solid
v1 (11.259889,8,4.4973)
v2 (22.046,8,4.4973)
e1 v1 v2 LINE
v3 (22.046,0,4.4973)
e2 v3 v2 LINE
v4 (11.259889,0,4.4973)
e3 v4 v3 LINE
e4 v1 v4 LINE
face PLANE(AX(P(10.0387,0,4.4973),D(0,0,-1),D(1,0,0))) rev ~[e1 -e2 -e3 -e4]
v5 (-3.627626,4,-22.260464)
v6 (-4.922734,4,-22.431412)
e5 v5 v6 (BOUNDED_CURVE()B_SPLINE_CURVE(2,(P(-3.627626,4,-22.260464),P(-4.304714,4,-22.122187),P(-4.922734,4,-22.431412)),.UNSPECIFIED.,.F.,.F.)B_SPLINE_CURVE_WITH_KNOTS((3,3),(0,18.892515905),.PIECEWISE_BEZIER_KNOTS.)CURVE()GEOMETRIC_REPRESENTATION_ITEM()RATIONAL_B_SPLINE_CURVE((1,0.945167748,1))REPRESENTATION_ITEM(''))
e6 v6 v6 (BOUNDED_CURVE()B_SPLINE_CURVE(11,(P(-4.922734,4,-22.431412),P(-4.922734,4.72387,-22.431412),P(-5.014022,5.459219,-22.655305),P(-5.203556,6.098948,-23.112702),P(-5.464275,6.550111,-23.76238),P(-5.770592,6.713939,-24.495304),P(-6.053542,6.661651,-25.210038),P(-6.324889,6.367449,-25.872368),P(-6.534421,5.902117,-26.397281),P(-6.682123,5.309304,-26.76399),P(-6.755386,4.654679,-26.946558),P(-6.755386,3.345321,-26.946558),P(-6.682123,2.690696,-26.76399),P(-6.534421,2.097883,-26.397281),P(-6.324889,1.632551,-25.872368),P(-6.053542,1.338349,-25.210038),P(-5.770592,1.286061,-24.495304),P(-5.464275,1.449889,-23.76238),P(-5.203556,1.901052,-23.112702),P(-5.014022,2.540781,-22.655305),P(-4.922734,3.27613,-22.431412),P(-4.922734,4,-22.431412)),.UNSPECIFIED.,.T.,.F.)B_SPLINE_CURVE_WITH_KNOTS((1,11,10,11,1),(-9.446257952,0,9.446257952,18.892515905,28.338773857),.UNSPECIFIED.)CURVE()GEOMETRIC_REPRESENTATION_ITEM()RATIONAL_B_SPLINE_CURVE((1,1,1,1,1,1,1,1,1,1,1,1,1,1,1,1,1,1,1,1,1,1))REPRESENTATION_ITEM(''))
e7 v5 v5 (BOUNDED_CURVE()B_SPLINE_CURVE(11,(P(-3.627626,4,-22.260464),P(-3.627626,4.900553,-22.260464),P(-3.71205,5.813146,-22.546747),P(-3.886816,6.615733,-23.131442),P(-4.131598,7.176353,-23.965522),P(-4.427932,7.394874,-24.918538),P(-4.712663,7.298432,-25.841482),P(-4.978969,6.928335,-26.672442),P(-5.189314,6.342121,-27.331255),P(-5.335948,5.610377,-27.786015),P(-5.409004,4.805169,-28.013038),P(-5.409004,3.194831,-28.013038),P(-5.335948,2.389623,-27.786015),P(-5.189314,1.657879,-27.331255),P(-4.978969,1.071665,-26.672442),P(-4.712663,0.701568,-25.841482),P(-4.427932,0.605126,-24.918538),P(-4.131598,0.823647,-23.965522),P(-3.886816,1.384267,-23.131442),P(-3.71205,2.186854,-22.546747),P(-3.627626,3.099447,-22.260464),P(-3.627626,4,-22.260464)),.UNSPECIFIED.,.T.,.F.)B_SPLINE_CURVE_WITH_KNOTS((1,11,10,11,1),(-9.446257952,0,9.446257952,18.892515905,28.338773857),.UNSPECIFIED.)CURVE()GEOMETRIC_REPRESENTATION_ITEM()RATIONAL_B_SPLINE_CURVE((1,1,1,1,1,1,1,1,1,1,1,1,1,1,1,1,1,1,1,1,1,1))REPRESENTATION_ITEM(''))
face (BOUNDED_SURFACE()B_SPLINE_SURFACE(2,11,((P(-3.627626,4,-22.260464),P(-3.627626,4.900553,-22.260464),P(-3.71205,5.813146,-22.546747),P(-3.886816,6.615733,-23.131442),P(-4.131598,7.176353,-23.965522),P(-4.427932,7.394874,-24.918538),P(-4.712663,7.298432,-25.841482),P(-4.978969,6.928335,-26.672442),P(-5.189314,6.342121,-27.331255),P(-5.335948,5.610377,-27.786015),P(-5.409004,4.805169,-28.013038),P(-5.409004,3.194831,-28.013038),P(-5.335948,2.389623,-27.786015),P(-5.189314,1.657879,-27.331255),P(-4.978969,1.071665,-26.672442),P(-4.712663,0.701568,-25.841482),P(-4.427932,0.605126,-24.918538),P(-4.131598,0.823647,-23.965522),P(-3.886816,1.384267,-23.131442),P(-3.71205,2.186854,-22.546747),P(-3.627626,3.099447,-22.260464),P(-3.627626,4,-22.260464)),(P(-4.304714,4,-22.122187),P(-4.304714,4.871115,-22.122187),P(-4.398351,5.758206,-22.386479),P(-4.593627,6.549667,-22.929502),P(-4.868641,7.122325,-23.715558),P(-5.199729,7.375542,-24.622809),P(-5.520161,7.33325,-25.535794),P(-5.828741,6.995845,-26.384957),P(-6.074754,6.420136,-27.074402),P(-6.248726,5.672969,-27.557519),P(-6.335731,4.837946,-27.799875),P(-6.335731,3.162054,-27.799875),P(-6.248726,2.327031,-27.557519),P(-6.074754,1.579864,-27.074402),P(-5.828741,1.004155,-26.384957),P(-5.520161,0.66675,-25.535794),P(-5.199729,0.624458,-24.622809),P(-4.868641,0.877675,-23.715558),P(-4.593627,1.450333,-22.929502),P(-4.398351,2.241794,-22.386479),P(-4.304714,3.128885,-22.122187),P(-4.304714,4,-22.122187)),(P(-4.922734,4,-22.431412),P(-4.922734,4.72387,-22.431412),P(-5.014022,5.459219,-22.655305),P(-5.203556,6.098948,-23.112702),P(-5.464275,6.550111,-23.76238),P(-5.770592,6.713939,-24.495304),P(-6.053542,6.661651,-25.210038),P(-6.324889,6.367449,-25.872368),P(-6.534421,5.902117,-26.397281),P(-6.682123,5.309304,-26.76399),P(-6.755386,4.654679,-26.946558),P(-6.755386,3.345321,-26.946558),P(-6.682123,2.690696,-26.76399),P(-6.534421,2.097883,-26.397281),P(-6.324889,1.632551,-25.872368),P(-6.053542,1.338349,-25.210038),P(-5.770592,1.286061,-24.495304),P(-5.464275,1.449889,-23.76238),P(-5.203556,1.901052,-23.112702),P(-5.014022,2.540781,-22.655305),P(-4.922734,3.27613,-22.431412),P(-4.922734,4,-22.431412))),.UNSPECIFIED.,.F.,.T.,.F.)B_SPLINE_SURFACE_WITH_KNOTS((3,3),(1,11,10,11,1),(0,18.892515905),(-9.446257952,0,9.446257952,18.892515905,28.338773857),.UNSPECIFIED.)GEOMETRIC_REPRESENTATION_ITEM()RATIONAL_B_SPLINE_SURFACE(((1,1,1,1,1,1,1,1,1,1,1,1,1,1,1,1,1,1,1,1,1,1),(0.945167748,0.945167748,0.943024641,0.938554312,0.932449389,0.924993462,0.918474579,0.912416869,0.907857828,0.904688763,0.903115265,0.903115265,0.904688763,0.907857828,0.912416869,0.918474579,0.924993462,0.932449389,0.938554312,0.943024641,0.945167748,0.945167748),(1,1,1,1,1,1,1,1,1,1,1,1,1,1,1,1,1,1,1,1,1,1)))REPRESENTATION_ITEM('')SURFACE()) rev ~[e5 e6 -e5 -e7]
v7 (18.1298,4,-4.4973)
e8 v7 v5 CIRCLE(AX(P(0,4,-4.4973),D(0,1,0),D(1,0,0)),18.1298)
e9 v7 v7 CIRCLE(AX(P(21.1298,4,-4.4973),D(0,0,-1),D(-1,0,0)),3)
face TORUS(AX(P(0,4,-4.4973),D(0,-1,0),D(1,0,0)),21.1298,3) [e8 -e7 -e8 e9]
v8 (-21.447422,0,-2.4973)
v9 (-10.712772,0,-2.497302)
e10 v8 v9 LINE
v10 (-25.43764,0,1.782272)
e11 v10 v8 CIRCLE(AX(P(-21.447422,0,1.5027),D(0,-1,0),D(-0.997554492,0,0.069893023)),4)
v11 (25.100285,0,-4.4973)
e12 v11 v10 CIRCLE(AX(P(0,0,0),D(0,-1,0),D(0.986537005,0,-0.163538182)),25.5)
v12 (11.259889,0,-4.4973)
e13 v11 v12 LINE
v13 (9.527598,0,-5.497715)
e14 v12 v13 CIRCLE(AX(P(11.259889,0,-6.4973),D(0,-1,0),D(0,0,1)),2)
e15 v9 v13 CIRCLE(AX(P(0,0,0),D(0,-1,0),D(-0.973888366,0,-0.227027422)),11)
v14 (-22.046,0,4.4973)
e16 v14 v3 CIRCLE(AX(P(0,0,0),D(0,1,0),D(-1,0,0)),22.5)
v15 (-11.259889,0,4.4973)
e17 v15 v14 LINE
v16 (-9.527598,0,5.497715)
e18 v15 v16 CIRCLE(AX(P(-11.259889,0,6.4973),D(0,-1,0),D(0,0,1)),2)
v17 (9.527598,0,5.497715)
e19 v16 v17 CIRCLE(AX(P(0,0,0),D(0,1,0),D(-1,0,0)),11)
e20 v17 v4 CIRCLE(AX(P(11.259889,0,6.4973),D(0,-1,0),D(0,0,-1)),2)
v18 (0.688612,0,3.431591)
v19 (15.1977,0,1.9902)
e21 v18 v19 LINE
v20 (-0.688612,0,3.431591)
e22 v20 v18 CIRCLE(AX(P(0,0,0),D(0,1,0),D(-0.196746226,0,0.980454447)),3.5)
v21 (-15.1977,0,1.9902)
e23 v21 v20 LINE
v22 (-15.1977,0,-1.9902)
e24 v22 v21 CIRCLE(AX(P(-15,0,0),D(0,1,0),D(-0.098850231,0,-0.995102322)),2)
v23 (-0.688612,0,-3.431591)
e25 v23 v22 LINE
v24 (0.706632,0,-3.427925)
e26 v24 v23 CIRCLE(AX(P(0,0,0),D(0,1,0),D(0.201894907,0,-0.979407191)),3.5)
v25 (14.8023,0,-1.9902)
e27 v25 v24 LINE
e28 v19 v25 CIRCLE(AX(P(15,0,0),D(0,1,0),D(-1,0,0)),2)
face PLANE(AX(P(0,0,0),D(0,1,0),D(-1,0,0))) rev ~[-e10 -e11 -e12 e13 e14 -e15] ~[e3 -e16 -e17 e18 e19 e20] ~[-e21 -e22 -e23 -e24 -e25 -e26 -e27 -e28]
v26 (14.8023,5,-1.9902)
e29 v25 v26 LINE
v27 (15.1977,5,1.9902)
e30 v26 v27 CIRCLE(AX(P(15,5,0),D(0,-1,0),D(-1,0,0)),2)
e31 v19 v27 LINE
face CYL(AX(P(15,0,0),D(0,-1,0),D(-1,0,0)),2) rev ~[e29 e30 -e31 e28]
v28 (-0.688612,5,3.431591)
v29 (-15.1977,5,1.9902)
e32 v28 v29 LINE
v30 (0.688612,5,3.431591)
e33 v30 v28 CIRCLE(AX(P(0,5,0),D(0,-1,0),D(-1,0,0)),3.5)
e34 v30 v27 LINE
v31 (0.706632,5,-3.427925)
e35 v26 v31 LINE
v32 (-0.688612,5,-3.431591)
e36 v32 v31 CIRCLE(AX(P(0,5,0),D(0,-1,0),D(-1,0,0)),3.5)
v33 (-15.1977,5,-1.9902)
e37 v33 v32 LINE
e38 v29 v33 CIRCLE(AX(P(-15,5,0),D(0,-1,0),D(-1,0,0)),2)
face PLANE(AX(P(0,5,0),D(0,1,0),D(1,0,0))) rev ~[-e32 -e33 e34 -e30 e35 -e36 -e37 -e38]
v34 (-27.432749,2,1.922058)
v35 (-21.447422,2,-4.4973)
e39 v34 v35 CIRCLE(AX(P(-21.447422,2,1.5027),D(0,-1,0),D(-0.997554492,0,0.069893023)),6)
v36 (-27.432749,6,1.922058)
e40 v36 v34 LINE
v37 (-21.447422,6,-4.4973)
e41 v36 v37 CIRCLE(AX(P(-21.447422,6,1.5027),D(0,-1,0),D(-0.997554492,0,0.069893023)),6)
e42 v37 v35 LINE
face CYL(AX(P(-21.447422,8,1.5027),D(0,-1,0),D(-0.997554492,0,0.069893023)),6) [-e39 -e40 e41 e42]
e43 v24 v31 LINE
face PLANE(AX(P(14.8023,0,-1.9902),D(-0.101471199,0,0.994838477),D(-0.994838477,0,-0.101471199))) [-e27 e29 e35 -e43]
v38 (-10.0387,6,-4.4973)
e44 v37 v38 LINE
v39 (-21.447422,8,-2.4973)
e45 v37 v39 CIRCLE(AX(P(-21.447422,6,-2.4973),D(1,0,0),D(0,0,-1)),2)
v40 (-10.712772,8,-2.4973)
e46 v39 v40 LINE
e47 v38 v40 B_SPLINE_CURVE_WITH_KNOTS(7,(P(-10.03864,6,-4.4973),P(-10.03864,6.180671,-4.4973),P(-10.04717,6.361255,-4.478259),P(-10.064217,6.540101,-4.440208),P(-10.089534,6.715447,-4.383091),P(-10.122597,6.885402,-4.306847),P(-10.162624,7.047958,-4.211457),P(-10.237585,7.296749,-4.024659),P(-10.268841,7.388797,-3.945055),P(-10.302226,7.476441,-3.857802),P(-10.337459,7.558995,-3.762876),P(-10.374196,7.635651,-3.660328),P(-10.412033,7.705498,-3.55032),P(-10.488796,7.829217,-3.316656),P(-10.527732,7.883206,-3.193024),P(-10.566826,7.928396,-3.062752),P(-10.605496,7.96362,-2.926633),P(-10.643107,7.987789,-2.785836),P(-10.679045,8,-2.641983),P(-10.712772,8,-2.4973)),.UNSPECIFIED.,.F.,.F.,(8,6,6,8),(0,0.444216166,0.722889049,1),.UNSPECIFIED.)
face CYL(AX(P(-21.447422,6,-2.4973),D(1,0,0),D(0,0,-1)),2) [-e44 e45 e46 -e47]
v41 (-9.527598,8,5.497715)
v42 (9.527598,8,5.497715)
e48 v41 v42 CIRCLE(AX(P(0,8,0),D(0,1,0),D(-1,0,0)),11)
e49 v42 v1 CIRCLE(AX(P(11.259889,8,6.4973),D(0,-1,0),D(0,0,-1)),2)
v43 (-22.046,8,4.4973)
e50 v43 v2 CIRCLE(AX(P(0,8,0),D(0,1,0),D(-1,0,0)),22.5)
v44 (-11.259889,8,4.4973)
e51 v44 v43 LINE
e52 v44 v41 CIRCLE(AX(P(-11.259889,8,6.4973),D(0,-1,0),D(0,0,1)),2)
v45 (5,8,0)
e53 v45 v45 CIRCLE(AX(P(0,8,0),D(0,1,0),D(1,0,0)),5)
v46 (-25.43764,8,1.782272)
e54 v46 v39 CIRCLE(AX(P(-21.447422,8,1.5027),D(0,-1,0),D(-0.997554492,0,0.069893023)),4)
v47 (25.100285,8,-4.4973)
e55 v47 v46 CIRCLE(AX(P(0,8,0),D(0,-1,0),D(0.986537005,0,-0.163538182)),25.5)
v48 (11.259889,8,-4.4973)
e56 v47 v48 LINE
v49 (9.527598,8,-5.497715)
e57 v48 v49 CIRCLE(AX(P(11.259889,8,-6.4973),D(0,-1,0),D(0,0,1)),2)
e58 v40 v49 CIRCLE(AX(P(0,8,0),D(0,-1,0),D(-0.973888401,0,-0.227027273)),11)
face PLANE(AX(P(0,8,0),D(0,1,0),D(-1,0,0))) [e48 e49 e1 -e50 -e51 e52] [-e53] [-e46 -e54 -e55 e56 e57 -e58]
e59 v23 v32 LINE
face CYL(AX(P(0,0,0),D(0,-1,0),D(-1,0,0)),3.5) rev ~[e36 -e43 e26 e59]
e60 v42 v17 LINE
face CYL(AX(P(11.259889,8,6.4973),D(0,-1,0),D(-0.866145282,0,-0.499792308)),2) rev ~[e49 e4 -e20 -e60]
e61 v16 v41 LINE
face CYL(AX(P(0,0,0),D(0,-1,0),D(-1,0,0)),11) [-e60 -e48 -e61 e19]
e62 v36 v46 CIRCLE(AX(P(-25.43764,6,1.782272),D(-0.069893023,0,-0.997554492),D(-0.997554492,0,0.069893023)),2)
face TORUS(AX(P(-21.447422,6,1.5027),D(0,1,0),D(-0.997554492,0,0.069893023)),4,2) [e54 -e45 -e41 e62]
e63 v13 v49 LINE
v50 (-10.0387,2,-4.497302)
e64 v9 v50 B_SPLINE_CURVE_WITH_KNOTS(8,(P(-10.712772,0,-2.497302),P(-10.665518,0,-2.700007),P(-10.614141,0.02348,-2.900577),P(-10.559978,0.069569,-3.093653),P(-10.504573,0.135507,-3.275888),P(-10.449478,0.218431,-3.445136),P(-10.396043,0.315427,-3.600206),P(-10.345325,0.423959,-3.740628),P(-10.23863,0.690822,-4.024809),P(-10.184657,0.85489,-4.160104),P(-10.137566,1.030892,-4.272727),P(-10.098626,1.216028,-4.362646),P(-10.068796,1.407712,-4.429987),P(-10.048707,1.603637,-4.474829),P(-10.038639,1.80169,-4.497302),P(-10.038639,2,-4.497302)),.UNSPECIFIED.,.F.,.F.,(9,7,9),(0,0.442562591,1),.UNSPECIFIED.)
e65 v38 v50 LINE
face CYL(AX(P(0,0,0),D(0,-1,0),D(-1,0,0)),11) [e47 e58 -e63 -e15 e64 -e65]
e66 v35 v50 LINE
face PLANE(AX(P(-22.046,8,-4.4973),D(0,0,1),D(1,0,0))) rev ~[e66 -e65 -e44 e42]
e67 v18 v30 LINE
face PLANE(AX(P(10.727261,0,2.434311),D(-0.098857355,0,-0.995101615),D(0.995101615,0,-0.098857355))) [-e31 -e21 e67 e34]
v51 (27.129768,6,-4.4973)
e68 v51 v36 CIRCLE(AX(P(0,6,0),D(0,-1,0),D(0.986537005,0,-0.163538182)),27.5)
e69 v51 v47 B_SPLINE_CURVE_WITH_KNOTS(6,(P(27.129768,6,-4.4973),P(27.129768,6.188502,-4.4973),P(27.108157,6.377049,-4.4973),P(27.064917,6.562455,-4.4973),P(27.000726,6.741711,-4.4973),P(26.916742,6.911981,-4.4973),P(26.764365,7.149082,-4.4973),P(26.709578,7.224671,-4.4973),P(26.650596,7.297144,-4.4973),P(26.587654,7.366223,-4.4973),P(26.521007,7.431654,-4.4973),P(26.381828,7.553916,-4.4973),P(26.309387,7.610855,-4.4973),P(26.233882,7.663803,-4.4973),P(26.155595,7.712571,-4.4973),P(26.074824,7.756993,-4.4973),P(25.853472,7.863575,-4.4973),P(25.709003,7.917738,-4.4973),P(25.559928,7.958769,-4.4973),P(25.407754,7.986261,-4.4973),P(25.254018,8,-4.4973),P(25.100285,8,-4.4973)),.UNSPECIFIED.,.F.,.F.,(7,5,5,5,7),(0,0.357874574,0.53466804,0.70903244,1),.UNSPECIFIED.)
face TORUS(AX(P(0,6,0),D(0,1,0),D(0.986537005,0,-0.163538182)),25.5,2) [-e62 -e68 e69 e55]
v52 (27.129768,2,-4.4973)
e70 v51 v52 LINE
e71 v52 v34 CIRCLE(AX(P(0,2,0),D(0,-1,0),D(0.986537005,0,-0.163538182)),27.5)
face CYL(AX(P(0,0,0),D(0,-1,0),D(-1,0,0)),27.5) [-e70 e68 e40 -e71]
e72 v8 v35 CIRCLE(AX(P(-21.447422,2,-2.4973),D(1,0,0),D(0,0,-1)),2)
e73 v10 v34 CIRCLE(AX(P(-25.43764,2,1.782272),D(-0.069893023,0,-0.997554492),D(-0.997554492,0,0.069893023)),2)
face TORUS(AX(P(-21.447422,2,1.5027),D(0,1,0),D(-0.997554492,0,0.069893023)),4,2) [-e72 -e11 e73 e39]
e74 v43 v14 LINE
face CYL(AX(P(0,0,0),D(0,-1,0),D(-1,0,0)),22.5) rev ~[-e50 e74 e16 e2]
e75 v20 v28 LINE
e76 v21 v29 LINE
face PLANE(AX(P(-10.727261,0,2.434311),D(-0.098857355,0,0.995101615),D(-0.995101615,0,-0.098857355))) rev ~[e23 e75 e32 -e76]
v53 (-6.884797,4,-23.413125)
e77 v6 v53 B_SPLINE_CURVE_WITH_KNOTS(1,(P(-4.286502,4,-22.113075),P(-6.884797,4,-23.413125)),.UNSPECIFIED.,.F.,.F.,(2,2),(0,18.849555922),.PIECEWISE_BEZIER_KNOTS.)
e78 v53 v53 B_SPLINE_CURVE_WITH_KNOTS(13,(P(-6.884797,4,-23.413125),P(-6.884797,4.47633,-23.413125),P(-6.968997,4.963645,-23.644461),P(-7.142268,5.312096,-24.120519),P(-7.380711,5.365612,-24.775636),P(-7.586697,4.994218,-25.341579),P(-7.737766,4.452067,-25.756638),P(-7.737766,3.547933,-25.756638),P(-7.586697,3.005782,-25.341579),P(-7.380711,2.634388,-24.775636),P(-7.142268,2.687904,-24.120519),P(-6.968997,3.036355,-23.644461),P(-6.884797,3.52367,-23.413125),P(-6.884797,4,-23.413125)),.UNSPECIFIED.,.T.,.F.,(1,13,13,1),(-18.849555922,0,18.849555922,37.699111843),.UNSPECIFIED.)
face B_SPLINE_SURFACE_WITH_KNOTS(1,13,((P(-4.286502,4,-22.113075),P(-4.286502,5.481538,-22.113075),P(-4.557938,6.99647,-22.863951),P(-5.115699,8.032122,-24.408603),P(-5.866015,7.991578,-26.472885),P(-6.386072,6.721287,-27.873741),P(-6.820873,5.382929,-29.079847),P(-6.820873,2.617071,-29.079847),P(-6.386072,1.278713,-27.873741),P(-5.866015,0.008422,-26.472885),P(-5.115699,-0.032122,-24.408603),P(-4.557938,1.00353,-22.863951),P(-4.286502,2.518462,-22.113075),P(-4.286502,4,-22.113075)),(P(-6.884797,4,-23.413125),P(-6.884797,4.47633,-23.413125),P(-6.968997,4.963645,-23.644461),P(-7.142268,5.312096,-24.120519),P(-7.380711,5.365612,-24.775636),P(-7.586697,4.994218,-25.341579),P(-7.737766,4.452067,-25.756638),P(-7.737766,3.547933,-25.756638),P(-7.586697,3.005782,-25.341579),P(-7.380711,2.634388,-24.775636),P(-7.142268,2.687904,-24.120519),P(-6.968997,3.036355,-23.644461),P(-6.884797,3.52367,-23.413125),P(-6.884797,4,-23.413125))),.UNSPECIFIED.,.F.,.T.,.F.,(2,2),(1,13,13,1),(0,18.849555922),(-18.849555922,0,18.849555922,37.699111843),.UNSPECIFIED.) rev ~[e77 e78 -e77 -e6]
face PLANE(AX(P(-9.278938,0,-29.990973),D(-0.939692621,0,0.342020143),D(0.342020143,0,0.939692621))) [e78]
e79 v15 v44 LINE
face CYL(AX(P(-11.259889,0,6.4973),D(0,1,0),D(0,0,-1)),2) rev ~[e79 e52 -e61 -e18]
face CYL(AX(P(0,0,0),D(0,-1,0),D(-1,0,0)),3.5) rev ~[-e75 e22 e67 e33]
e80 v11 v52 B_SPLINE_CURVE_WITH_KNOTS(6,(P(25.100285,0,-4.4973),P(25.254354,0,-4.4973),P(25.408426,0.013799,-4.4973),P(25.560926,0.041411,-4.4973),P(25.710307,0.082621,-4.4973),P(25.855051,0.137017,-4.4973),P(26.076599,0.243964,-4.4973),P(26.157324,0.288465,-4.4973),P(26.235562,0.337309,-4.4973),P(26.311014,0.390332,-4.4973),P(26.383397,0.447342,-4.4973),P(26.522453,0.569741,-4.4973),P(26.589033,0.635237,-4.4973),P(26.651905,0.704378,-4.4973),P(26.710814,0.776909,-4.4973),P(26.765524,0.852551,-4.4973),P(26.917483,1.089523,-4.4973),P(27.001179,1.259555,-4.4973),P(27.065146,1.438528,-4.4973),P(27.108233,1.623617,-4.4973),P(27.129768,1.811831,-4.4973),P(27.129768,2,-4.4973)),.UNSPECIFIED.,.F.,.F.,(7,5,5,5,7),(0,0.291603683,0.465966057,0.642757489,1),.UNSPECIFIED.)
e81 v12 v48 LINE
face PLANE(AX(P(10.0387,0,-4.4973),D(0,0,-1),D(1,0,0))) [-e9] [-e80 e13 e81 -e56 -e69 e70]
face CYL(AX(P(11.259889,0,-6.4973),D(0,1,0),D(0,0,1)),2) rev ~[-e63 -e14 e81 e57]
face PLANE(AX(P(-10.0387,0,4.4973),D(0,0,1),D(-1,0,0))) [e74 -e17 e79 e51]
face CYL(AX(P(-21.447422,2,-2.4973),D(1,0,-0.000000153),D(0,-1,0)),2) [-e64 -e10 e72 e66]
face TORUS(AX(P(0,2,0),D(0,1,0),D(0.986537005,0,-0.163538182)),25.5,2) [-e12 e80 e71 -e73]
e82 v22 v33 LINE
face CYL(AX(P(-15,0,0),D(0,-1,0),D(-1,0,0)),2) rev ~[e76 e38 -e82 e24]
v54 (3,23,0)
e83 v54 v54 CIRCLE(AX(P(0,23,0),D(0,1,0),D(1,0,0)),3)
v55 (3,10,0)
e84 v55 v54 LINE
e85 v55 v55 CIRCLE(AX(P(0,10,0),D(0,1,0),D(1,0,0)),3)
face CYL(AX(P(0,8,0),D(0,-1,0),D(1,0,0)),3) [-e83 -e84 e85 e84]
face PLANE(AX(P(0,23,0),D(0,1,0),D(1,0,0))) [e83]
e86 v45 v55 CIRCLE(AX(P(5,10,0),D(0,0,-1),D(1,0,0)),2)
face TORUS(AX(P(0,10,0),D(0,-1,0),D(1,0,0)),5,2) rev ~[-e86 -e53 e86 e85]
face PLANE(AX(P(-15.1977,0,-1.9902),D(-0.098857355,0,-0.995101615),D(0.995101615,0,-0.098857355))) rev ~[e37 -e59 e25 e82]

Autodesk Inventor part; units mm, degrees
ref_plane "YZ Plane" through (0, 0, 0) normal (1, 0, 0) x (0, 1, 0)
ref_plane "XZ Plane" through (0, 0, 0) normal (0, 1, 0) x (-1, 0, 0)
ref_plane "XY Plane" through (0, 0, 0) normal (0, 0, 1) x (1, 0, 0)
sketch "Skizze1" plane through (0, 0, 0) normal (0, 1, 0) x (-1, 0, 0)
  circle A0 centre (0, 0) radius 27.5
  circle A1 centre (0, 0) radius 22.5
  circle A2 centre (0, 0) radius 3.5
  line L0 (45.7225, 0) -> (-63.662, 0) construction
  line L1 (0, 78.2374) -> (0, -78.2374) construction
  circle A3 centre (15, 0) radius 2
  circle A4 centre (-15, 0) radius 2
  line L2 (0, 3.5) -> (15.1977, 1.9902)
  line L3 (15.1977, -1.9902) -> (0, -3.5)
  line L4 (-14.8023, -1.9902) -> (0, -3.5)
  line L5 (0, 3.5) -> (-15.1977, 1.9902)
  circle A5 centre (0, 0) radius 11
  line L6 (10.0387, 4.4973) -> (22.046, 4.4973)
  line L7 (-10.0387, 4.4973) -> (-22.046, 4.4973)
  line L8 (10.0387, -4.4973) -> (22.046, -4.4973)
  line L9 (-10.0387, -4.4973) -> (-22.046, -4.4973)
  point P0 (27.1298, 4.4973)
  point P1 (-27.023, -5.1)
  point P2 (13.75, -23.8157)
  point P3 (-13.75, 23.8157)
  point P4 (-0.6886, 3.4316)
  point P5 (0.6886, 3.4316)
  point P6 (0.6886, -3.4316)
  point P7 (-0.7066, -3.4279)
  dimension "d0" = 55
  dimension "d1" = 45
  dimension "d2" = 7
  dimension "d3" = 4
  dimension "d4" = 4
  dimension "d5" = 15
  dimension "d6" = 22
ref_plane "Arbeitsebene1" through (0, 3.7, 0) normal (0, 1, 0) x (1, 0, 0)
extrude "Extrusion3" add sketch "Skizze1" along normal blind 8 contours A0 | A1 L8 A5 L3 A3 L2 L6 | L7 A5 L5 A4 L4 L9 A1 | A5 L2 A2 L5 | A5 L4 A2 L3
sketch "Skizze3" plane through (0, 8, 0) normal (0, 1, 0) x (1, 0, 0)
  arc A0 (22.046, 4.4973) -> (-22.046, 4.4973) centre (0, 0) ccw projected
  arc A1 (-22.046, -4.4973) -> (22.046, -4.4973) centre (0, 0) ccw projected
  line L0 (-22.046, 4.4973) -> (22.046, 4.4973)
  line L1 (22.046, 4.4973) -> (22.046, -4.4973)
  line L2 (22.046, -4.4973) -> (-22.046, -4.4973)
  line L3 (-22.046, -4.4973) -> (-22.046, 4.4973)
extrude "Extrusion4" add sketch "Skizze3" against normal blind 3 contours L1 L2 L3 L0
sketch "Skizze7" plane through (0, 8, 0) normal (0, 1, 0) x (1, 0, 0)
  arc A0 (22.046, 4.4973) -> (-22.046, 4.4973) centre (0, 0) ccw projected
  line L0 (-22.046, 4.4973) -> (-27.1298, 4.4973)
  circle A1 centre (0, 0) radius 27.5 projected
  line L1 (22.046, 4.4973) -> (10.0387, 4.4973) projected
  line L2 (22.046, 4.4973) -> (27.1412, 4.4973)
  line L3 (27.1412, 4.4973) -> (9.9712, 4.4973)
  arc A2 (10.0387, 4.4973) -> (-10.0387, 4.4973) centre (0, 0) ccw projected
  line L4 (-22.046, 4.4973) -> (-10.0387, 4.4973)
  circle A3 centre (0, 0) radius 11
  circle A4 centre (0, 0) radius 27.5
  point P0 (27.1298, 4.4973)
extrude "Extrusion8" cut sketch "Skizze7" against normal blind 10 contours L1 A2 L4 A0 | A0 L0 A1 L2
sketch "Skizze8" plane through (27.1298, 0, -4.4973) normal (0, 0, -1) x (-1, 0, 0)
  circle A0 centre (6, 4) radius 3
  line L0 (-1.9792, 4) -> (11.3711, 4) construction
  line L1 (0, 8) -> (17.0911, 8) construction
  line L2 (6, -1.8512) -> (6, 10.0367) construction
  line L3 (0, 0) -> (0, 8) construction
  line L4 (27.1298, -4.2288) -> (27.1298, 12.4142) projected
  point P0 (27.1298, 0)
  dimension "d37" = 4
  dimension "d38" = 6
  dimension "d39" = 6
revolve "Umdrehung1" add sketch "Skizze8" angle 110 about axis through (0, -10, -4.4973) along (0, 1, 0)
chamfer "Fase1" distance 2 angle 45 1 edges at (-8.2529, 4, -27.1718)
fillet "Rundung7" radius 2 1 edges at (-6.3467, 4, -27.7774)
fillet "Rundung8" radius 6 1 edges at (-27.1298, 4, -4.4973)
fillet "Rundung9" radius 2 6 edges at (-25.8358, 0, -2.589) (-15.743, 0, -4.4973) (3.2133, 0, 27.3116) (-25.8358, 8, -2.589) (-15.743, 8, -4.4973) (3.2133, 8, 27.3116)
sketch "Skizze9" plane through (0, 8, 0) normal (0, 1, 0) x (1, 0, 0)
  circle A0 centre (0, 0) radius 3
  dimension "d47" = 6
extrude "Extrusion9" add sketch "Skizze9" along normal blind 15
fillet "Rundung10" radius 2 3 edges at (10.0387, 4, 4.4973) (10.0387, 4, -4.4973) (-10.0387, 4, 4.4973)
fillet "Rundung11" radius 2 1 edges at (-3, 8, 0)
properties part number "_3D-Druck"
